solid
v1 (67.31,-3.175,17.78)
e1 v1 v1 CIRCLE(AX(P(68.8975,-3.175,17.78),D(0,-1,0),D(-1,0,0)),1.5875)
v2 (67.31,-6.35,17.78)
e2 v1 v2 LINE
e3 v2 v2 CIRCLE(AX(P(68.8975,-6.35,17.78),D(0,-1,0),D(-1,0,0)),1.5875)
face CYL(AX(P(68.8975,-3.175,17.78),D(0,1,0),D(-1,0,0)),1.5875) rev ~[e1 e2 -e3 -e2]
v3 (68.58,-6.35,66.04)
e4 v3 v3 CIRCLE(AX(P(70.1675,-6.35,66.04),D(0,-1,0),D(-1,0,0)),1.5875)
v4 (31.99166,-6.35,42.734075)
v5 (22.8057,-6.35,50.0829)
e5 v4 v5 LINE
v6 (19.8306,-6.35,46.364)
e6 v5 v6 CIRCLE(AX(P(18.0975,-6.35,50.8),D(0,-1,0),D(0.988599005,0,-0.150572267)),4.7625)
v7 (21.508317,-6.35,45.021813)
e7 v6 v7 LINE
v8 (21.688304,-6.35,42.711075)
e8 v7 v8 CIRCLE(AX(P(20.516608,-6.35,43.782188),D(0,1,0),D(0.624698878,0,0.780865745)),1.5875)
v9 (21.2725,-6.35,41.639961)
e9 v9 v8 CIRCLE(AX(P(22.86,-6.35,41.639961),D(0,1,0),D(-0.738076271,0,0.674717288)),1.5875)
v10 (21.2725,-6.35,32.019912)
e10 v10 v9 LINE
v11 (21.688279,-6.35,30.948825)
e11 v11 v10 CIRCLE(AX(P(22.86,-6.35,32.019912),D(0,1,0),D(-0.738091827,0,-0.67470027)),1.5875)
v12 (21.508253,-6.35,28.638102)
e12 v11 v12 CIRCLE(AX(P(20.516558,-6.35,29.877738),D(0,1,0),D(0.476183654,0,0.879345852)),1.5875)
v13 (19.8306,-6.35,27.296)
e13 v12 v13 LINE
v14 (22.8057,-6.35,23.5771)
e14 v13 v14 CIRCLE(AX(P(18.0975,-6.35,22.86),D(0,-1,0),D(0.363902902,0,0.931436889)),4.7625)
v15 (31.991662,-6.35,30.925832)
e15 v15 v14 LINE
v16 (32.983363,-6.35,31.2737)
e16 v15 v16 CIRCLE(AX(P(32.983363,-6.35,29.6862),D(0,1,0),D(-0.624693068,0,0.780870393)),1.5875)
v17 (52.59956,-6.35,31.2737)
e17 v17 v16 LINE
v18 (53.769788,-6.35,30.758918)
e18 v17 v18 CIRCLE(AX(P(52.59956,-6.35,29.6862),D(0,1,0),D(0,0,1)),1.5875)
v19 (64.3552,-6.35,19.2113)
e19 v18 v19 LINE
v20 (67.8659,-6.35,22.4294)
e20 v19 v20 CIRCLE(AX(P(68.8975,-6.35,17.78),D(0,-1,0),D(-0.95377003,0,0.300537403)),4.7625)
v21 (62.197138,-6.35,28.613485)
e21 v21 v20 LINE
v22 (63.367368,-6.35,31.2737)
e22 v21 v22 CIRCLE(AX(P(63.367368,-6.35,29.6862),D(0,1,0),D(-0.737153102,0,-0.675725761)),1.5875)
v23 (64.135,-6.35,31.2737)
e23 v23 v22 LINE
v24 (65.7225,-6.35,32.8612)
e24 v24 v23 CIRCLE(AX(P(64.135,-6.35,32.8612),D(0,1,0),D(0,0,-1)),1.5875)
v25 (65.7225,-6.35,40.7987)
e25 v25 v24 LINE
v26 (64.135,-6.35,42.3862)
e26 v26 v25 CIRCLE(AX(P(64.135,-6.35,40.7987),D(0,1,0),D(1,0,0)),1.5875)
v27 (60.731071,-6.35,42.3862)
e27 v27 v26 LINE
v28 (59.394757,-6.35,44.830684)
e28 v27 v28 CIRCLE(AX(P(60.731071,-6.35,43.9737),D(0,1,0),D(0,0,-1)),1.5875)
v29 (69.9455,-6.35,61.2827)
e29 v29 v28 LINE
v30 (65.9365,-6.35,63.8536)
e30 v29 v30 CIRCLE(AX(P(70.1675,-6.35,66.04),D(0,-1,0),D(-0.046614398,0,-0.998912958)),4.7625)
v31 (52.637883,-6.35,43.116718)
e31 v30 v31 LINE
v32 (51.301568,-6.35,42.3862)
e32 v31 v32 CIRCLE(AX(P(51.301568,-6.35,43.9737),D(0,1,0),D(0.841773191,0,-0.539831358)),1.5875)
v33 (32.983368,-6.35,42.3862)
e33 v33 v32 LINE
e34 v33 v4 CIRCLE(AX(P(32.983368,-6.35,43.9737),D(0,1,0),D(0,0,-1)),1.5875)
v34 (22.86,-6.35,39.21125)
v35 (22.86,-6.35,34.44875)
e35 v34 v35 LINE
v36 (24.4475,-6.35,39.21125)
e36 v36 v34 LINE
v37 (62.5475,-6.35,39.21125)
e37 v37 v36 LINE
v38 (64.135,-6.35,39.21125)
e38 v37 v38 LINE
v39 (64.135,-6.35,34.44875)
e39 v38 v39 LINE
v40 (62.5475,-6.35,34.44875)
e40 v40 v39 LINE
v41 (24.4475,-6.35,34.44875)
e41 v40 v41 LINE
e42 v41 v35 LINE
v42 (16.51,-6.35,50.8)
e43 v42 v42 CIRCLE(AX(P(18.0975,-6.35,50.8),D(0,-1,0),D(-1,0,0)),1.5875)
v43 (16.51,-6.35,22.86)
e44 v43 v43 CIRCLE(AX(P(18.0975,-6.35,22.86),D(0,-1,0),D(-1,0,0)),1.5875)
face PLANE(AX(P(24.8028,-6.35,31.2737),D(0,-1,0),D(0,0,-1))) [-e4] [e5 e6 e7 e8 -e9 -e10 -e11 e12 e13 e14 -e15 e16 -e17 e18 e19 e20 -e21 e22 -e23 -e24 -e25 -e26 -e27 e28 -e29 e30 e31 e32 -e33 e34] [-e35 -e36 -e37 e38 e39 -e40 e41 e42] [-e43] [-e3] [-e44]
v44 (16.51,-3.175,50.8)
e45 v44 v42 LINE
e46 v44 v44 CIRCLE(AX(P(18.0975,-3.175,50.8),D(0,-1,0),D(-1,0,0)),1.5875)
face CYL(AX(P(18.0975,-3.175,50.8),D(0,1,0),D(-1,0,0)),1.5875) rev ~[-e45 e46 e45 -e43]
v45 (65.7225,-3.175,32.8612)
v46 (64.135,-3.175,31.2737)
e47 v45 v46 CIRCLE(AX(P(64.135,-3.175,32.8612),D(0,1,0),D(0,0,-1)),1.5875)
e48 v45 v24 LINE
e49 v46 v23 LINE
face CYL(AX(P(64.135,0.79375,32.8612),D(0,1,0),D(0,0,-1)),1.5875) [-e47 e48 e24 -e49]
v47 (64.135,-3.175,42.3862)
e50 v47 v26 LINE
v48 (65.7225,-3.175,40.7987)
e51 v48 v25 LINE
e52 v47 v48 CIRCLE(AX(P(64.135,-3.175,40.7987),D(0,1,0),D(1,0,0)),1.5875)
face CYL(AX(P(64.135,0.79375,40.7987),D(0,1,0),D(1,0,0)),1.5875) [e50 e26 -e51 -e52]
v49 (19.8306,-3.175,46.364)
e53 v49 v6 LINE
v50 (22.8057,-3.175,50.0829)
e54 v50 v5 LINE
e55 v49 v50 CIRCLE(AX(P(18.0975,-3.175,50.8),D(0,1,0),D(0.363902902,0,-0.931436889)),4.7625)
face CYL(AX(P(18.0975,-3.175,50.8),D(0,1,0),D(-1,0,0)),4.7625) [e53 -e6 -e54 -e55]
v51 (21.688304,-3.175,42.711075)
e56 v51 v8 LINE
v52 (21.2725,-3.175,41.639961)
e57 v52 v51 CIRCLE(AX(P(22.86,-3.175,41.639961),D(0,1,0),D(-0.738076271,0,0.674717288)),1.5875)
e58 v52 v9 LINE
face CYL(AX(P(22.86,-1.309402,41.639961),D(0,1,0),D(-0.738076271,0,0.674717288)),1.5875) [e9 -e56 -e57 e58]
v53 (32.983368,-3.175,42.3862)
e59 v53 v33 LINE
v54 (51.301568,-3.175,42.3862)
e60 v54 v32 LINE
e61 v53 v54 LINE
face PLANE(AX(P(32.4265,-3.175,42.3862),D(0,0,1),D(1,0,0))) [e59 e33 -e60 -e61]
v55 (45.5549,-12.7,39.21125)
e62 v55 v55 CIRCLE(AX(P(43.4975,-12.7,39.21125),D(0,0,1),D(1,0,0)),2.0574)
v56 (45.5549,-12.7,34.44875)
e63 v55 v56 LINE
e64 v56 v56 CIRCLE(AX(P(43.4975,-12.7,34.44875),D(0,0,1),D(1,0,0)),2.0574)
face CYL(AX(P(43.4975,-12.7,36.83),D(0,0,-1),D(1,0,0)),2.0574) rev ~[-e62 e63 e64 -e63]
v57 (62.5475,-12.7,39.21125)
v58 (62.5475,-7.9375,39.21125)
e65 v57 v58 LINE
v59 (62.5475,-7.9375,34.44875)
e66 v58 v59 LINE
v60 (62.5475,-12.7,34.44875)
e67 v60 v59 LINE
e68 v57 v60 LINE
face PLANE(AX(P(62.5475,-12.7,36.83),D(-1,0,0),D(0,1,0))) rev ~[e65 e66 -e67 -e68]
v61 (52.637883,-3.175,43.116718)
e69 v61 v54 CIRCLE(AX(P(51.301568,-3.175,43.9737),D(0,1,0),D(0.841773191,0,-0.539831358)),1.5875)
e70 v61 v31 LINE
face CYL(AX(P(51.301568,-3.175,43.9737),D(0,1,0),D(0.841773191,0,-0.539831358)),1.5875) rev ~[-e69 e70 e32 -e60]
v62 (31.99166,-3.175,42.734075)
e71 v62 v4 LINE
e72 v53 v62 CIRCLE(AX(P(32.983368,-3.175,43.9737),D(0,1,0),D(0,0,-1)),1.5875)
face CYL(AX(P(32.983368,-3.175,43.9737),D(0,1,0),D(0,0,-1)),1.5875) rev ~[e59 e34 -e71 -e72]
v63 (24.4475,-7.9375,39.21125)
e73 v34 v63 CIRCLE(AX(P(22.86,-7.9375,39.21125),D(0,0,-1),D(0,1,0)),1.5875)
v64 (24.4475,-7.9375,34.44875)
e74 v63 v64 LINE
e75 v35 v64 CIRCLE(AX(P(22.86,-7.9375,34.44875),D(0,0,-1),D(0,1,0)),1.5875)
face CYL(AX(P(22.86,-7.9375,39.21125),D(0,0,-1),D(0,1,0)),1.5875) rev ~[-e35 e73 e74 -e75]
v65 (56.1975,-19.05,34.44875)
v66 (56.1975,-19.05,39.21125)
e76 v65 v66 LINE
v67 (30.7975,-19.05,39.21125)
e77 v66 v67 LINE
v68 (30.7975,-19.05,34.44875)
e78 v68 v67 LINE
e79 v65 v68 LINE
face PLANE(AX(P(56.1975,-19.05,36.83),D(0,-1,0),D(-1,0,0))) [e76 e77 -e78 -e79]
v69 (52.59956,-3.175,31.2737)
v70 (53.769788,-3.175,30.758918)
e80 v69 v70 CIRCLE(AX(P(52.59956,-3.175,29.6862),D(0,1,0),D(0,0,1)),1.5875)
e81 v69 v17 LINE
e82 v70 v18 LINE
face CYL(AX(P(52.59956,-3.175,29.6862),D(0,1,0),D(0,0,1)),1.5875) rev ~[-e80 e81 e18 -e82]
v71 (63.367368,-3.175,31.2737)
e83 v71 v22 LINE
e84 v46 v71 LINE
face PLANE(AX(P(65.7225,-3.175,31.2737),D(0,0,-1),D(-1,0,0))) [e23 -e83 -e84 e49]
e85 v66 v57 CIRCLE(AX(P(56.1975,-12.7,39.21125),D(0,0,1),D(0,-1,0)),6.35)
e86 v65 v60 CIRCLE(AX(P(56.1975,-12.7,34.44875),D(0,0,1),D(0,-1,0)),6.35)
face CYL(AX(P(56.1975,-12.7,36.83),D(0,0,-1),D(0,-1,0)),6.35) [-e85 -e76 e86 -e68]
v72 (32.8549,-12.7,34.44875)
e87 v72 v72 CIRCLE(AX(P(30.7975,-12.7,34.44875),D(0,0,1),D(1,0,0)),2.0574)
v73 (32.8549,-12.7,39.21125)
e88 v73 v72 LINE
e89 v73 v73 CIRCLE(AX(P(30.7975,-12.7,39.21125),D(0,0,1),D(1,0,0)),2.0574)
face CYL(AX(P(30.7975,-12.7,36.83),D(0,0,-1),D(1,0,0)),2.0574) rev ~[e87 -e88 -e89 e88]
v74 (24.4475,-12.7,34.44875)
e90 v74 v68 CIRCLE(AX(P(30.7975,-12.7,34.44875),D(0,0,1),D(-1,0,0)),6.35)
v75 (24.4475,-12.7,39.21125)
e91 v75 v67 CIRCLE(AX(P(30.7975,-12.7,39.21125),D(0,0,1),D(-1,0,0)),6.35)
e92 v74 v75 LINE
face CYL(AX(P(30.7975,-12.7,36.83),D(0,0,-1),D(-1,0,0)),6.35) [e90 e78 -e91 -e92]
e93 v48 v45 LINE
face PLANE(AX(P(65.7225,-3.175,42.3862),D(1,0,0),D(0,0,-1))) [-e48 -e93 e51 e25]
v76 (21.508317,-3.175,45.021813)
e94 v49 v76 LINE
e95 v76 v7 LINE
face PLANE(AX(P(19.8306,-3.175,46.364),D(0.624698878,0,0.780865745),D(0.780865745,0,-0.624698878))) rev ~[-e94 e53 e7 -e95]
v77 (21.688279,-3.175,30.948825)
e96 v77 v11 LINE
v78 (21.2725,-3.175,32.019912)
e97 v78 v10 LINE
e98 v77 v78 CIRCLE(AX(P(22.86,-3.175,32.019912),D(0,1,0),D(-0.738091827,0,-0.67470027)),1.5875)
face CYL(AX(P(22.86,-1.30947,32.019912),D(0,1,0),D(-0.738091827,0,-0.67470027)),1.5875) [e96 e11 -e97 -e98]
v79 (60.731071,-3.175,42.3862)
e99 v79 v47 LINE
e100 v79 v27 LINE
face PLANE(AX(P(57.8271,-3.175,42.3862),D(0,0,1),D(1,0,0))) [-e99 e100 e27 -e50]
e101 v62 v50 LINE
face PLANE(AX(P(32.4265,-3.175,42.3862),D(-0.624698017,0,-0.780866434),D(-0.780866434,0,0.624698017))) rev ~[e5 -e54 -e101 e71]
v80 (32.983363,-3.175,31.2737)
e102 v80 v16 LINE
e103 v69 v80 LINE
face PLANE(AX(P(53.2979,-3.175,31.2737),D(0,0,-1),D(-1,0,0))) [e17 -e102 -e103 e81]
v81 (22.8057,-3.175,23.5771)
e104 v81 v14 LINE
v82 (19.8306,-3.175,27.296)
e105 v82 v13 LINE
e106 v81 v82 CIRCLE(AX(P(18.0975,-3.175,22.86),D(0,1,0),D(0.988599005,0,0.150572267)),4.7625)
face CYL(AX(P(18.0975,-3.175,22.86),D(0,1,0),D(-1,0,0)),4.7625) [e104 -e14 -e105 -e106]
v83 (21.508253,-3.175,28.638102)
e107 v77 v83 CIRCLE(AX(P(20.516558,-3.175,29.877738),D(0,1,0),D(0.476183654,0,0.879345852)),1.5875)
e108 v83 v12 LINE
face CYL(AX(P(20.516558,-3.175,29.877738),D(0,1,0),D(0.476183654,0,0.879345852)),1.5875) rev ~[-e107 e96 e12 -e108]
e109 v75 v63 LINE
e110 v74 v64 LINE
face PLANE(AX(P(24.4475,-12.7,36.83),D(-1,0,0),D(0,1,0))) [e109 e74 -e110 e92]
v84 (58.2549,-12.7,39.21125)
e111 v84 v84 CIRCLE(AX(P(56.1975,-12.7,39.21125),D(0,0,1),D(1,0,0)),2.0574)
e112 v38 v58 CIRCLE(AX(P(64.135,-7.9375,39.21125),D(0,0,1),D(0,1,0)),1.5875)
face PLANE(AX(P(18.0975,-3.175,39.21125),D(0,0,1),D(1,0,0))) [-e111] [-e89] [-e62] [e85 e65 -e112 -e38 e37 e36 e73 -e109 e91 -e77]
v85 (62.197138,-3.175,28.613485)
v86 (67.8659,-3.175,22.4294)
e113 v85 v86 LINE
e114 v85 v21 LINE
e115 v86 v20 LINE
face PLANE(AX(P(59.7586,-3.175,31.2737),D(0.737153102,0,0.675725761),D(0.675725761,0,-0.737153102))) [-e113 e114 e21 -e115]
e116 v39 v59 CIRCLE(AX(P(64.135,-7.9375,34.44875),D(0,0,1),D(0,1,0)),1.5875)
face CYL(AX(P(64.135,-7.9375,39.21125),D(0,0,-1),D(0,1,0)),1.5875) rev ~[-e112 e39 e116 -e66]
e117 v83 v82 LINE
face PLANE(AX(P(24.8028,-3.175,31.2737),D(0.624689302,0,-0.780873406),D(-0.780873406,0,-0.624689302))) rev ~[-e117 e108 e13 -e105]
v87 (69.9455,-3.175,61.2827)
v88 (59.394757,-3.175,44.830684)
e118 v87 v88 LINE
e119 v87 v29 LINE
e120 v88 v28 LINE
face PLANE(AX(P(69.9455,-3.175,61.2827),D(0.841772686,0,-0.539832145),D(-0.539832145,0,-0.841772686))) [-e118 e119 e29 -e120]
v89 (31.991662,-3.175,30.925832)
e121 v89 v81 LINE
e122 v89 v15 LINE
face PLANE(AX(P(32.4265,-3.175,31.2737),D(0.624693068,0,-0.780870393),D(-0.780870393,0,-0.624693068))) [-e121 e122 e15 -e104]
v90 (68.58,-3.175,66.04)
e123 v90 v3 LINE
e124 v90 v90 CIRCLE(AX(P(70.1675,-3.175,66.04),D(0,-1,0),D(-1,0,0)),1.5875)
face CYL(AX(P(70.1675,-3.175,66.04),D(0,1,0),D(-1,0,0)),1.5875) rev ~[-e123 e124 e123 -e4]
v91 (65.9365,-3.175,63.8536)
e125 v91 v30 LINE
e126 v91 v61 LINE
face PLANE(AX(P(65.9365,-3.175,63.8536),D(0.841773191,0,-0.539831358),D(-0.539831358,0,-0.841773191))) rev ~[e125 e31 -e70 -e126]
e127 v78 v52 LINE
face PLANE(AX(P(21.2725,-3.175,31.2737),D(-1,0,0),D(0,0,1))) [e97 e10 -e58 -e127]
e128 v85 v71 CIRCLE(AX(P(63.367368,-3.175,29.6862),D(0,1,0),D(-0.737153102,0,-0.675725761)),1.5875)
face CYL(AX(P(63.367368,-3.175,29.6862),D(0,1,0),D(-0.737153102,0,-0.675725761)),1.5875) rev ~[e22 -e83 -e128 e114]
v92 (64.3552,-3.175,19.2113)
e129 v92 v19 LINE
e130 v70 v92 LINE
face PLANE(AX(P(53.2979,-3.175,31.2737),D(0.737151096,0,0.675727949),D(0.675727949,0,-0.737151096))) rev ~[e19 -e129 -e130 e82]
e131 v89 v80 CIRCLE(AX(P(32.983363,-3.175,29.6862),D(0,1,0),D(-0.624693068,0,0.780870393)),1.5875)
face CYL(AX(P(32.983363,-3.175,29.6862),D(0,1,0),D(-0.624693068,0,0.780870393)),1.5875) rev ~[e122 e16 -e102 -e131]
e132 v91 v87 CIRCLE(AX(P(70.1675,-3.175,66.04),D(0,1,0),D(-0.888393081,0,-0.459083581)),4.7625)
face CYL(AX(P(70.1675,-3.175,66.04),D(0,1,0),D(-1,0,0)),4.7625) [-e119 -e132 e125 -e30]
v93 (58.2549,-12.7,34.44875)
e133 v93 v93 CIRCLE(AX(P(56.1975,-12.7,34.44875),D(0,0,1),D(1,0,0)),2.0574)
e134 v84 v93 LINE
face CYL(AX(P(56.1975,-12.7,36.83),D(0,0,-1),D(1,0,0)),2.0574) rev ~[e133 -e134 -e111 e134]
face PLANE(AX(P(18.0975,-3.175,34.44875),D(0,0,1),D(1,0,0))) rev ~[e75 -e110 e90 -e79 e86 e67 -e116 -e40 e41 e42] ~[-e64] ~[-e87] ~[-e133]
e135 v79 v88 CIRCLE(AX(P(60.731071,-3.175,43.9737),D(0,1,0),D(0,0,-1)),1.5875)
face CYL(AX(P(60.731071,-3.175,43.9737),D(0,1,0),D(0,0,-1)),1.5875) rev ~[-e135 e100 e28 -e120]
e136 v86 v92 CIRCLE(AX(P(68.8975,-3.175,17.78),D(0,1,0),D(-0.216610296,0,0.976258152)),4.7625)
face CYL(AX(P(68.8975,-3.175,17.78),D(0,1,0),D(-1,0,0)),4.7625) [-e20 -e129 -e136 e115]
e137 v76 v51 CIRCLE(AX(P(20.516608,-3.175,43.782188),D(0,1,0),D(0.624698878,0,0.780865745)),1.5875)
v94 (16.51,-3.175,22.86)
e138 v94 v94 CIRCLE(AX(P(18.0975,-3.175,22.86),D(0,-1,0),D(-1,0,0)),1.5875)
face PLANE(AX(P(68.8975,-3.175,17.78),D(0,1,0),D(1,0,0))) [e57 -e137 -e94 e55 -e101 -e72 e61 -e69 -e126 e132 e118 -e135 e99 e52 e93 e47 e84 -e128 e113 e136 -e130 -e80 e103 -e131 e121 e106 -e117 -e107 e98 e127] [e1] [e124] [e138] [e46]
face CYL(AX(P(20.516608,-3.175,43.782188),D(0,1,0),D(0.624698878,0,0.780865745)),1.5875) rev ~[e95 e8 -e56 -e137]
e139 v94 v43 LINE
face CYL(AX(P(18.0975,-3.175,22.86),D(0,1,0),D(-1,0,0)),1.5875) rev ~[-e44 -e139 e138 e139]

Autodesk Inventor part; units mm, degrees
ref_plane "Work Plane1" through (50.6765, 0, 41.694) normal (0, -1, 0) x (-1, 0, 0)
ref_plane "Work Plane2" through (50.6765, -3.175, 41.694) normal (0, -1, 0) x (-1, 0, 0)
sketch "Sketch2" plane through (50.6765, -3.175, 41.694) normal (0, -1, 0) x (-1, 0, 0)
  circle A0 centre (32.579, -9.106) radius 1.5875 construction
  circle A1 centre (32.579, 18.834) radius 1.5875 construction
  circle A2 centre (-18.221, 23.914) radius 1.5875 construction
  circle A3 centre (-19.491, -24.346) radius 1.5875 construction
  line L0 (-33.461, 26.454) -> (-33.461, -26.886) construction
  line L1 (-33.461, -26.886) -> (30.039, -26.886) construction
  line L2 (30.039, -26.886) -> (32.579, -24.346) construction
  line L3 (32.579, -24.346) -> (32.579, -12.916) construction
  line L4 (32.579, -12.916) -> (35.119, -10.376) construction
  line L5 (35.119, -10.376) -> (35.119, 20.104) construction
  line L6 (35.119, 20.104) -> (32.579, 22.644) construction
  line L7 (32.579, 22.644) -> (32.579, 26.454) construction
  line L8 (32.579, 26.454) -> (-33.461, 26.454) construction
  circle A4 centre (32.579, -9.106) radius 1.5875
  circle A5 centre (-18.221, 23.914) radius 1.5875
  circle A6 centre (32.579, 18.834) radius 1.5875
  circle A7 centre (32.579, -9.106) radius 4.7625
  circle A8 centre (32.579, 18.834) radius 4.7625
  circle A9 centre (-18.221, 23.914) radius 4.7625
  circle A10 centre (-19.491, -24.346) radius 1.5875
  circle A11 centre (-19.491, -24.346) radius 4.7625
  point P0 (50.6765, 41.694)
  dimension "d7" = 9.525
  dimension "d8" = 9.525
  dimension "d9" = 9.525
  dimension "d10" = 3.175
  dimension "d11" = 9.525
extrude "Extrusion2" add sketch "Sketch2" along normal blind 3.175
ref_plane "Work Plane7" through (18.0975, -3.175, 36.83) normal (0, 0, 1) x (1, 0, 0)
ref_plane "Work Plane4" through (18.0975, -3.175, 27.6225) normal (0, 0, 1) x (1, 0, 0)
ref_plane "Work Plane6" through (18.0975, -3.175, 46.0375) normal (0, 0, -1) x (-1, 0, 0)
sketch "Sketch3" plane through (18.0975, -3.175, 36.83) normal (0, 0, 1) x (1, 0, 0)
  line L0 (46.0375, -3.175) -> (55.5625, -3.175) construction
  line L1 (55.5625, 0) -> (46.0375, 0) construction
  line L2 (-4.7625, -3.175) -> (4.7625, -3.175) construction
  line L3 (4.7625, 0) -> (-4.7625, 0) construction
  line L4 (46.0375, -3.175) -> (4.7625, -3.175) construction
  line L5 (4.7625, 0) -> (4.7625, -3.175) construction
  line L6 (25.4, -3.175) -> (25.4, -15.875) construction
  circle A0 centre (25.4, -9.525) radius 2.0574
  circle A1 centre (25.4, -9.525) radius 6.35 construction
  circle A2 centre (12.7, -9.525) radius 2.0574
  arc A3 (6.35, -9.525) -> (12.7, -15.875) centre (12.7, -9.525) ccw
  circle A4 centre (38.1, -9.525) radius 2.0574
  arc A5 (38.1, -15.875) -> (44.45, -9.525) centre (38.1, -9.525) ccw
  line L7 (38.1, -15.875) -> (12.7, -15.875)
  line L8 (44.45, -9.525) -> (44.45, -3.175)
  line L9 (6.35, -9.525) -> (6.35, -3.175)
  line L10 (44.45, -3.175) -> (6.35, -3.175)
  point P0 (-18.0975, 3.175)
  dimension "d14" = 4.1148
  dimension "d15" = 12.7
  dimension "d16" = 4.1148
  dimension "d17" = 12.7
extrude "Extrusion3" add sketch "Sketch3" along normal mid plane 4.7625
sketch "Sketch4" plane through (68.8975, -3.175, 17.78) normal (0, 1, 0) x (1, 0, 0)
  circle A0 centre (1.27, -48.26) radius 4.7625 construction
  circle A1 centre (1.27, -48.26) radius 1.5875 construction
  circle A2 centre (0, 0) radius 1.5875 construction
  circle A3 centre (0, 0) radius 4.7625 construction
  circle A4 centre (-50.8, -5.08) radius 1.5875 construction
  circle A5 centre (-50.8, -5.08) radius 4.7625 construction
  circle A6 centre (-50.8, -33.02) radius 4.7625 construction
  circle A7 centre (-50.8, -33.02) radius 1.5875 construction
  line L0 (-44.45, -16.6687) -> (-6.35, -16.6687) construction
  line L1 (-6.35, -21.4312) -> (-44.45, -21.4312) construction
  line L2 (-44.45, -21.4312) -> (-44.45, -16.6687) construction
  line L3 (-6.35, -21.4312) -> (-6.35, -16.6687) construction
  line L4 (-6.35, -19.05) -> (-44.45, -19.05) construction
  line L5 (-50.8, -33.02) -> (-33.3375, -19.05) construction
  line L6 (-33.3375, -19.05) -> (-50.8, -5.08) construction
  circle A8 centre (0, 0) radius 1.5875 construction
  line L7 (0, 0) -> (-17.4625, -19.05) construction
  circle A9 centre (1.27, -48.26) radius 1.5875 construction
  line L8 (1.27, -48.26) -> (-17.4625, -19.05) construction
  line L9 (-27.4574, -16.6687) -> (-23.3426, -16.6687) construction
  line L10 (-23.3426, -21.4312) -> (-27.4574, -21.4312) construction
  line L11 (-25.4, -21.4312) -> (-25.4, -16.6687) construction
  line L12 (-47.625, -13.4937) -> (-47.625, -24.6062)
  line L13 (-3.175, -24.6062) -> (-3.175, -13.4937)
  line L14 (-2.961, -46.0736) -> (-16.7281, -24.6062)
  line L15 (-15.5996, -13.4937) -> (-4.5423, -1.4313)
  line L16 (-9.1389, -13.4937) -> (-1.0316, -4.6494)
  line L17 (1.048, -43.5027) -> (-11.0704, -24.6062)
  arc A10 (1.048, -43.5027) -> (-2.961, -46.0736) centre (1.27, -48.26) ccw
  arc A11 (-4.5423, -1.4313) -> (-1.0316, -4.6494) centre (0, 0) ccw
  line L18 (-36.471, -24.6062) -> (-46.0918, -32.3029)
  circle A12 centre (-50.8, -33.02) radius 4.7625 construction
  line L19 (-49.0669, -28.584) -> (-44.0947, -24.6062)
  line L20 (-36.471, -13.4937) -> (-46.0918, -5.7971)
  line L21 (-44.0947, -13.4937) -> (-49.0669, -9.516)
  arc A13 (-46.0918, -32.3029) -> (-49.0669, -28.584) centre (-50.8, -33.02) ccw
  arc A14 (-49.0669, -9.516) -> (-46.0918, -5.7971) centre (-50.8, -5.08) ccw
  line L22 (-47.625, -24.6062) -> (-44.0947, -24.6062)
  line L23 (-44.0947, -13.4937) -> (-47.625, -13.4937)
  line L24 (-3.175, -13.4937) -> (-9.1389, -13.4937)
  line L25 (-15.5996, -13.4937) -> (-36.471, -13.4937)
  line L26 (-36.471, -24.6062) -> (-16.7281, -24.6062)
  line L27 (-11.0704, -24.6062) -> (-3.175, -24.6062)
  point P0 (-68.8975, 17.78)
  dimension "d20" = 15.875
  dimension "d21" = 7.9375
  dimension "d28" = 2.3813
  dimension "d29" = 2.3813
  dimension "d30" = 2.3813
  dimension "d31" = 2.3813
  dimension "d32" = 2.3813
  dimension "d33" = 2.3813
  dimension "d34" = 2.3813
  dimension "d35" = 2.3813
  dimension "d36" = 3.175
  dimension "d37" = 3.175
  dimension "d38" = 3.175
  dimension "d39" = 3.175
extrude "Extrusion4" add sketch "Sketch4" against normal up to surface (3.175 mm away)
fillet "Fillet1" radius 1.5875 12 edges at (24.8028, -4.7625, 42.3862) (24.8028, -4.7625, 31.2737) (53.2979, -4.7625, 31.2737) (52.1694, -4.7625, 42.3862) (32.4265, -4.7625, 31.2737) (57.8271, -4.7625, 42.3862) (32.4265, -4.7625, 42.3862) (59.7586, -4.7625, 31.2737) (65.7225, -4.7625, 31.2737) (65.7225, -4.7625, 42.3862) (21.2725, -4.7625, 31.2737) (21.2725, -4.7625, 42.3862)
fillet "Fillet2" radius 1.5875 2 edges at (24.4475, -6.35, 36.83) (62.5475, -6.35, 36.83)
ref_plane "Work Plane3" through (20.6375, 0, 68.58) normal (0, 0, 1) x (1, 0, 0)
ref_plane "Work Plane5" through (84.1375, 0, 15.24) normal (0, 0, -1) x (-1, 0, 0)
properties part number "ChassisPrototypeA4"
